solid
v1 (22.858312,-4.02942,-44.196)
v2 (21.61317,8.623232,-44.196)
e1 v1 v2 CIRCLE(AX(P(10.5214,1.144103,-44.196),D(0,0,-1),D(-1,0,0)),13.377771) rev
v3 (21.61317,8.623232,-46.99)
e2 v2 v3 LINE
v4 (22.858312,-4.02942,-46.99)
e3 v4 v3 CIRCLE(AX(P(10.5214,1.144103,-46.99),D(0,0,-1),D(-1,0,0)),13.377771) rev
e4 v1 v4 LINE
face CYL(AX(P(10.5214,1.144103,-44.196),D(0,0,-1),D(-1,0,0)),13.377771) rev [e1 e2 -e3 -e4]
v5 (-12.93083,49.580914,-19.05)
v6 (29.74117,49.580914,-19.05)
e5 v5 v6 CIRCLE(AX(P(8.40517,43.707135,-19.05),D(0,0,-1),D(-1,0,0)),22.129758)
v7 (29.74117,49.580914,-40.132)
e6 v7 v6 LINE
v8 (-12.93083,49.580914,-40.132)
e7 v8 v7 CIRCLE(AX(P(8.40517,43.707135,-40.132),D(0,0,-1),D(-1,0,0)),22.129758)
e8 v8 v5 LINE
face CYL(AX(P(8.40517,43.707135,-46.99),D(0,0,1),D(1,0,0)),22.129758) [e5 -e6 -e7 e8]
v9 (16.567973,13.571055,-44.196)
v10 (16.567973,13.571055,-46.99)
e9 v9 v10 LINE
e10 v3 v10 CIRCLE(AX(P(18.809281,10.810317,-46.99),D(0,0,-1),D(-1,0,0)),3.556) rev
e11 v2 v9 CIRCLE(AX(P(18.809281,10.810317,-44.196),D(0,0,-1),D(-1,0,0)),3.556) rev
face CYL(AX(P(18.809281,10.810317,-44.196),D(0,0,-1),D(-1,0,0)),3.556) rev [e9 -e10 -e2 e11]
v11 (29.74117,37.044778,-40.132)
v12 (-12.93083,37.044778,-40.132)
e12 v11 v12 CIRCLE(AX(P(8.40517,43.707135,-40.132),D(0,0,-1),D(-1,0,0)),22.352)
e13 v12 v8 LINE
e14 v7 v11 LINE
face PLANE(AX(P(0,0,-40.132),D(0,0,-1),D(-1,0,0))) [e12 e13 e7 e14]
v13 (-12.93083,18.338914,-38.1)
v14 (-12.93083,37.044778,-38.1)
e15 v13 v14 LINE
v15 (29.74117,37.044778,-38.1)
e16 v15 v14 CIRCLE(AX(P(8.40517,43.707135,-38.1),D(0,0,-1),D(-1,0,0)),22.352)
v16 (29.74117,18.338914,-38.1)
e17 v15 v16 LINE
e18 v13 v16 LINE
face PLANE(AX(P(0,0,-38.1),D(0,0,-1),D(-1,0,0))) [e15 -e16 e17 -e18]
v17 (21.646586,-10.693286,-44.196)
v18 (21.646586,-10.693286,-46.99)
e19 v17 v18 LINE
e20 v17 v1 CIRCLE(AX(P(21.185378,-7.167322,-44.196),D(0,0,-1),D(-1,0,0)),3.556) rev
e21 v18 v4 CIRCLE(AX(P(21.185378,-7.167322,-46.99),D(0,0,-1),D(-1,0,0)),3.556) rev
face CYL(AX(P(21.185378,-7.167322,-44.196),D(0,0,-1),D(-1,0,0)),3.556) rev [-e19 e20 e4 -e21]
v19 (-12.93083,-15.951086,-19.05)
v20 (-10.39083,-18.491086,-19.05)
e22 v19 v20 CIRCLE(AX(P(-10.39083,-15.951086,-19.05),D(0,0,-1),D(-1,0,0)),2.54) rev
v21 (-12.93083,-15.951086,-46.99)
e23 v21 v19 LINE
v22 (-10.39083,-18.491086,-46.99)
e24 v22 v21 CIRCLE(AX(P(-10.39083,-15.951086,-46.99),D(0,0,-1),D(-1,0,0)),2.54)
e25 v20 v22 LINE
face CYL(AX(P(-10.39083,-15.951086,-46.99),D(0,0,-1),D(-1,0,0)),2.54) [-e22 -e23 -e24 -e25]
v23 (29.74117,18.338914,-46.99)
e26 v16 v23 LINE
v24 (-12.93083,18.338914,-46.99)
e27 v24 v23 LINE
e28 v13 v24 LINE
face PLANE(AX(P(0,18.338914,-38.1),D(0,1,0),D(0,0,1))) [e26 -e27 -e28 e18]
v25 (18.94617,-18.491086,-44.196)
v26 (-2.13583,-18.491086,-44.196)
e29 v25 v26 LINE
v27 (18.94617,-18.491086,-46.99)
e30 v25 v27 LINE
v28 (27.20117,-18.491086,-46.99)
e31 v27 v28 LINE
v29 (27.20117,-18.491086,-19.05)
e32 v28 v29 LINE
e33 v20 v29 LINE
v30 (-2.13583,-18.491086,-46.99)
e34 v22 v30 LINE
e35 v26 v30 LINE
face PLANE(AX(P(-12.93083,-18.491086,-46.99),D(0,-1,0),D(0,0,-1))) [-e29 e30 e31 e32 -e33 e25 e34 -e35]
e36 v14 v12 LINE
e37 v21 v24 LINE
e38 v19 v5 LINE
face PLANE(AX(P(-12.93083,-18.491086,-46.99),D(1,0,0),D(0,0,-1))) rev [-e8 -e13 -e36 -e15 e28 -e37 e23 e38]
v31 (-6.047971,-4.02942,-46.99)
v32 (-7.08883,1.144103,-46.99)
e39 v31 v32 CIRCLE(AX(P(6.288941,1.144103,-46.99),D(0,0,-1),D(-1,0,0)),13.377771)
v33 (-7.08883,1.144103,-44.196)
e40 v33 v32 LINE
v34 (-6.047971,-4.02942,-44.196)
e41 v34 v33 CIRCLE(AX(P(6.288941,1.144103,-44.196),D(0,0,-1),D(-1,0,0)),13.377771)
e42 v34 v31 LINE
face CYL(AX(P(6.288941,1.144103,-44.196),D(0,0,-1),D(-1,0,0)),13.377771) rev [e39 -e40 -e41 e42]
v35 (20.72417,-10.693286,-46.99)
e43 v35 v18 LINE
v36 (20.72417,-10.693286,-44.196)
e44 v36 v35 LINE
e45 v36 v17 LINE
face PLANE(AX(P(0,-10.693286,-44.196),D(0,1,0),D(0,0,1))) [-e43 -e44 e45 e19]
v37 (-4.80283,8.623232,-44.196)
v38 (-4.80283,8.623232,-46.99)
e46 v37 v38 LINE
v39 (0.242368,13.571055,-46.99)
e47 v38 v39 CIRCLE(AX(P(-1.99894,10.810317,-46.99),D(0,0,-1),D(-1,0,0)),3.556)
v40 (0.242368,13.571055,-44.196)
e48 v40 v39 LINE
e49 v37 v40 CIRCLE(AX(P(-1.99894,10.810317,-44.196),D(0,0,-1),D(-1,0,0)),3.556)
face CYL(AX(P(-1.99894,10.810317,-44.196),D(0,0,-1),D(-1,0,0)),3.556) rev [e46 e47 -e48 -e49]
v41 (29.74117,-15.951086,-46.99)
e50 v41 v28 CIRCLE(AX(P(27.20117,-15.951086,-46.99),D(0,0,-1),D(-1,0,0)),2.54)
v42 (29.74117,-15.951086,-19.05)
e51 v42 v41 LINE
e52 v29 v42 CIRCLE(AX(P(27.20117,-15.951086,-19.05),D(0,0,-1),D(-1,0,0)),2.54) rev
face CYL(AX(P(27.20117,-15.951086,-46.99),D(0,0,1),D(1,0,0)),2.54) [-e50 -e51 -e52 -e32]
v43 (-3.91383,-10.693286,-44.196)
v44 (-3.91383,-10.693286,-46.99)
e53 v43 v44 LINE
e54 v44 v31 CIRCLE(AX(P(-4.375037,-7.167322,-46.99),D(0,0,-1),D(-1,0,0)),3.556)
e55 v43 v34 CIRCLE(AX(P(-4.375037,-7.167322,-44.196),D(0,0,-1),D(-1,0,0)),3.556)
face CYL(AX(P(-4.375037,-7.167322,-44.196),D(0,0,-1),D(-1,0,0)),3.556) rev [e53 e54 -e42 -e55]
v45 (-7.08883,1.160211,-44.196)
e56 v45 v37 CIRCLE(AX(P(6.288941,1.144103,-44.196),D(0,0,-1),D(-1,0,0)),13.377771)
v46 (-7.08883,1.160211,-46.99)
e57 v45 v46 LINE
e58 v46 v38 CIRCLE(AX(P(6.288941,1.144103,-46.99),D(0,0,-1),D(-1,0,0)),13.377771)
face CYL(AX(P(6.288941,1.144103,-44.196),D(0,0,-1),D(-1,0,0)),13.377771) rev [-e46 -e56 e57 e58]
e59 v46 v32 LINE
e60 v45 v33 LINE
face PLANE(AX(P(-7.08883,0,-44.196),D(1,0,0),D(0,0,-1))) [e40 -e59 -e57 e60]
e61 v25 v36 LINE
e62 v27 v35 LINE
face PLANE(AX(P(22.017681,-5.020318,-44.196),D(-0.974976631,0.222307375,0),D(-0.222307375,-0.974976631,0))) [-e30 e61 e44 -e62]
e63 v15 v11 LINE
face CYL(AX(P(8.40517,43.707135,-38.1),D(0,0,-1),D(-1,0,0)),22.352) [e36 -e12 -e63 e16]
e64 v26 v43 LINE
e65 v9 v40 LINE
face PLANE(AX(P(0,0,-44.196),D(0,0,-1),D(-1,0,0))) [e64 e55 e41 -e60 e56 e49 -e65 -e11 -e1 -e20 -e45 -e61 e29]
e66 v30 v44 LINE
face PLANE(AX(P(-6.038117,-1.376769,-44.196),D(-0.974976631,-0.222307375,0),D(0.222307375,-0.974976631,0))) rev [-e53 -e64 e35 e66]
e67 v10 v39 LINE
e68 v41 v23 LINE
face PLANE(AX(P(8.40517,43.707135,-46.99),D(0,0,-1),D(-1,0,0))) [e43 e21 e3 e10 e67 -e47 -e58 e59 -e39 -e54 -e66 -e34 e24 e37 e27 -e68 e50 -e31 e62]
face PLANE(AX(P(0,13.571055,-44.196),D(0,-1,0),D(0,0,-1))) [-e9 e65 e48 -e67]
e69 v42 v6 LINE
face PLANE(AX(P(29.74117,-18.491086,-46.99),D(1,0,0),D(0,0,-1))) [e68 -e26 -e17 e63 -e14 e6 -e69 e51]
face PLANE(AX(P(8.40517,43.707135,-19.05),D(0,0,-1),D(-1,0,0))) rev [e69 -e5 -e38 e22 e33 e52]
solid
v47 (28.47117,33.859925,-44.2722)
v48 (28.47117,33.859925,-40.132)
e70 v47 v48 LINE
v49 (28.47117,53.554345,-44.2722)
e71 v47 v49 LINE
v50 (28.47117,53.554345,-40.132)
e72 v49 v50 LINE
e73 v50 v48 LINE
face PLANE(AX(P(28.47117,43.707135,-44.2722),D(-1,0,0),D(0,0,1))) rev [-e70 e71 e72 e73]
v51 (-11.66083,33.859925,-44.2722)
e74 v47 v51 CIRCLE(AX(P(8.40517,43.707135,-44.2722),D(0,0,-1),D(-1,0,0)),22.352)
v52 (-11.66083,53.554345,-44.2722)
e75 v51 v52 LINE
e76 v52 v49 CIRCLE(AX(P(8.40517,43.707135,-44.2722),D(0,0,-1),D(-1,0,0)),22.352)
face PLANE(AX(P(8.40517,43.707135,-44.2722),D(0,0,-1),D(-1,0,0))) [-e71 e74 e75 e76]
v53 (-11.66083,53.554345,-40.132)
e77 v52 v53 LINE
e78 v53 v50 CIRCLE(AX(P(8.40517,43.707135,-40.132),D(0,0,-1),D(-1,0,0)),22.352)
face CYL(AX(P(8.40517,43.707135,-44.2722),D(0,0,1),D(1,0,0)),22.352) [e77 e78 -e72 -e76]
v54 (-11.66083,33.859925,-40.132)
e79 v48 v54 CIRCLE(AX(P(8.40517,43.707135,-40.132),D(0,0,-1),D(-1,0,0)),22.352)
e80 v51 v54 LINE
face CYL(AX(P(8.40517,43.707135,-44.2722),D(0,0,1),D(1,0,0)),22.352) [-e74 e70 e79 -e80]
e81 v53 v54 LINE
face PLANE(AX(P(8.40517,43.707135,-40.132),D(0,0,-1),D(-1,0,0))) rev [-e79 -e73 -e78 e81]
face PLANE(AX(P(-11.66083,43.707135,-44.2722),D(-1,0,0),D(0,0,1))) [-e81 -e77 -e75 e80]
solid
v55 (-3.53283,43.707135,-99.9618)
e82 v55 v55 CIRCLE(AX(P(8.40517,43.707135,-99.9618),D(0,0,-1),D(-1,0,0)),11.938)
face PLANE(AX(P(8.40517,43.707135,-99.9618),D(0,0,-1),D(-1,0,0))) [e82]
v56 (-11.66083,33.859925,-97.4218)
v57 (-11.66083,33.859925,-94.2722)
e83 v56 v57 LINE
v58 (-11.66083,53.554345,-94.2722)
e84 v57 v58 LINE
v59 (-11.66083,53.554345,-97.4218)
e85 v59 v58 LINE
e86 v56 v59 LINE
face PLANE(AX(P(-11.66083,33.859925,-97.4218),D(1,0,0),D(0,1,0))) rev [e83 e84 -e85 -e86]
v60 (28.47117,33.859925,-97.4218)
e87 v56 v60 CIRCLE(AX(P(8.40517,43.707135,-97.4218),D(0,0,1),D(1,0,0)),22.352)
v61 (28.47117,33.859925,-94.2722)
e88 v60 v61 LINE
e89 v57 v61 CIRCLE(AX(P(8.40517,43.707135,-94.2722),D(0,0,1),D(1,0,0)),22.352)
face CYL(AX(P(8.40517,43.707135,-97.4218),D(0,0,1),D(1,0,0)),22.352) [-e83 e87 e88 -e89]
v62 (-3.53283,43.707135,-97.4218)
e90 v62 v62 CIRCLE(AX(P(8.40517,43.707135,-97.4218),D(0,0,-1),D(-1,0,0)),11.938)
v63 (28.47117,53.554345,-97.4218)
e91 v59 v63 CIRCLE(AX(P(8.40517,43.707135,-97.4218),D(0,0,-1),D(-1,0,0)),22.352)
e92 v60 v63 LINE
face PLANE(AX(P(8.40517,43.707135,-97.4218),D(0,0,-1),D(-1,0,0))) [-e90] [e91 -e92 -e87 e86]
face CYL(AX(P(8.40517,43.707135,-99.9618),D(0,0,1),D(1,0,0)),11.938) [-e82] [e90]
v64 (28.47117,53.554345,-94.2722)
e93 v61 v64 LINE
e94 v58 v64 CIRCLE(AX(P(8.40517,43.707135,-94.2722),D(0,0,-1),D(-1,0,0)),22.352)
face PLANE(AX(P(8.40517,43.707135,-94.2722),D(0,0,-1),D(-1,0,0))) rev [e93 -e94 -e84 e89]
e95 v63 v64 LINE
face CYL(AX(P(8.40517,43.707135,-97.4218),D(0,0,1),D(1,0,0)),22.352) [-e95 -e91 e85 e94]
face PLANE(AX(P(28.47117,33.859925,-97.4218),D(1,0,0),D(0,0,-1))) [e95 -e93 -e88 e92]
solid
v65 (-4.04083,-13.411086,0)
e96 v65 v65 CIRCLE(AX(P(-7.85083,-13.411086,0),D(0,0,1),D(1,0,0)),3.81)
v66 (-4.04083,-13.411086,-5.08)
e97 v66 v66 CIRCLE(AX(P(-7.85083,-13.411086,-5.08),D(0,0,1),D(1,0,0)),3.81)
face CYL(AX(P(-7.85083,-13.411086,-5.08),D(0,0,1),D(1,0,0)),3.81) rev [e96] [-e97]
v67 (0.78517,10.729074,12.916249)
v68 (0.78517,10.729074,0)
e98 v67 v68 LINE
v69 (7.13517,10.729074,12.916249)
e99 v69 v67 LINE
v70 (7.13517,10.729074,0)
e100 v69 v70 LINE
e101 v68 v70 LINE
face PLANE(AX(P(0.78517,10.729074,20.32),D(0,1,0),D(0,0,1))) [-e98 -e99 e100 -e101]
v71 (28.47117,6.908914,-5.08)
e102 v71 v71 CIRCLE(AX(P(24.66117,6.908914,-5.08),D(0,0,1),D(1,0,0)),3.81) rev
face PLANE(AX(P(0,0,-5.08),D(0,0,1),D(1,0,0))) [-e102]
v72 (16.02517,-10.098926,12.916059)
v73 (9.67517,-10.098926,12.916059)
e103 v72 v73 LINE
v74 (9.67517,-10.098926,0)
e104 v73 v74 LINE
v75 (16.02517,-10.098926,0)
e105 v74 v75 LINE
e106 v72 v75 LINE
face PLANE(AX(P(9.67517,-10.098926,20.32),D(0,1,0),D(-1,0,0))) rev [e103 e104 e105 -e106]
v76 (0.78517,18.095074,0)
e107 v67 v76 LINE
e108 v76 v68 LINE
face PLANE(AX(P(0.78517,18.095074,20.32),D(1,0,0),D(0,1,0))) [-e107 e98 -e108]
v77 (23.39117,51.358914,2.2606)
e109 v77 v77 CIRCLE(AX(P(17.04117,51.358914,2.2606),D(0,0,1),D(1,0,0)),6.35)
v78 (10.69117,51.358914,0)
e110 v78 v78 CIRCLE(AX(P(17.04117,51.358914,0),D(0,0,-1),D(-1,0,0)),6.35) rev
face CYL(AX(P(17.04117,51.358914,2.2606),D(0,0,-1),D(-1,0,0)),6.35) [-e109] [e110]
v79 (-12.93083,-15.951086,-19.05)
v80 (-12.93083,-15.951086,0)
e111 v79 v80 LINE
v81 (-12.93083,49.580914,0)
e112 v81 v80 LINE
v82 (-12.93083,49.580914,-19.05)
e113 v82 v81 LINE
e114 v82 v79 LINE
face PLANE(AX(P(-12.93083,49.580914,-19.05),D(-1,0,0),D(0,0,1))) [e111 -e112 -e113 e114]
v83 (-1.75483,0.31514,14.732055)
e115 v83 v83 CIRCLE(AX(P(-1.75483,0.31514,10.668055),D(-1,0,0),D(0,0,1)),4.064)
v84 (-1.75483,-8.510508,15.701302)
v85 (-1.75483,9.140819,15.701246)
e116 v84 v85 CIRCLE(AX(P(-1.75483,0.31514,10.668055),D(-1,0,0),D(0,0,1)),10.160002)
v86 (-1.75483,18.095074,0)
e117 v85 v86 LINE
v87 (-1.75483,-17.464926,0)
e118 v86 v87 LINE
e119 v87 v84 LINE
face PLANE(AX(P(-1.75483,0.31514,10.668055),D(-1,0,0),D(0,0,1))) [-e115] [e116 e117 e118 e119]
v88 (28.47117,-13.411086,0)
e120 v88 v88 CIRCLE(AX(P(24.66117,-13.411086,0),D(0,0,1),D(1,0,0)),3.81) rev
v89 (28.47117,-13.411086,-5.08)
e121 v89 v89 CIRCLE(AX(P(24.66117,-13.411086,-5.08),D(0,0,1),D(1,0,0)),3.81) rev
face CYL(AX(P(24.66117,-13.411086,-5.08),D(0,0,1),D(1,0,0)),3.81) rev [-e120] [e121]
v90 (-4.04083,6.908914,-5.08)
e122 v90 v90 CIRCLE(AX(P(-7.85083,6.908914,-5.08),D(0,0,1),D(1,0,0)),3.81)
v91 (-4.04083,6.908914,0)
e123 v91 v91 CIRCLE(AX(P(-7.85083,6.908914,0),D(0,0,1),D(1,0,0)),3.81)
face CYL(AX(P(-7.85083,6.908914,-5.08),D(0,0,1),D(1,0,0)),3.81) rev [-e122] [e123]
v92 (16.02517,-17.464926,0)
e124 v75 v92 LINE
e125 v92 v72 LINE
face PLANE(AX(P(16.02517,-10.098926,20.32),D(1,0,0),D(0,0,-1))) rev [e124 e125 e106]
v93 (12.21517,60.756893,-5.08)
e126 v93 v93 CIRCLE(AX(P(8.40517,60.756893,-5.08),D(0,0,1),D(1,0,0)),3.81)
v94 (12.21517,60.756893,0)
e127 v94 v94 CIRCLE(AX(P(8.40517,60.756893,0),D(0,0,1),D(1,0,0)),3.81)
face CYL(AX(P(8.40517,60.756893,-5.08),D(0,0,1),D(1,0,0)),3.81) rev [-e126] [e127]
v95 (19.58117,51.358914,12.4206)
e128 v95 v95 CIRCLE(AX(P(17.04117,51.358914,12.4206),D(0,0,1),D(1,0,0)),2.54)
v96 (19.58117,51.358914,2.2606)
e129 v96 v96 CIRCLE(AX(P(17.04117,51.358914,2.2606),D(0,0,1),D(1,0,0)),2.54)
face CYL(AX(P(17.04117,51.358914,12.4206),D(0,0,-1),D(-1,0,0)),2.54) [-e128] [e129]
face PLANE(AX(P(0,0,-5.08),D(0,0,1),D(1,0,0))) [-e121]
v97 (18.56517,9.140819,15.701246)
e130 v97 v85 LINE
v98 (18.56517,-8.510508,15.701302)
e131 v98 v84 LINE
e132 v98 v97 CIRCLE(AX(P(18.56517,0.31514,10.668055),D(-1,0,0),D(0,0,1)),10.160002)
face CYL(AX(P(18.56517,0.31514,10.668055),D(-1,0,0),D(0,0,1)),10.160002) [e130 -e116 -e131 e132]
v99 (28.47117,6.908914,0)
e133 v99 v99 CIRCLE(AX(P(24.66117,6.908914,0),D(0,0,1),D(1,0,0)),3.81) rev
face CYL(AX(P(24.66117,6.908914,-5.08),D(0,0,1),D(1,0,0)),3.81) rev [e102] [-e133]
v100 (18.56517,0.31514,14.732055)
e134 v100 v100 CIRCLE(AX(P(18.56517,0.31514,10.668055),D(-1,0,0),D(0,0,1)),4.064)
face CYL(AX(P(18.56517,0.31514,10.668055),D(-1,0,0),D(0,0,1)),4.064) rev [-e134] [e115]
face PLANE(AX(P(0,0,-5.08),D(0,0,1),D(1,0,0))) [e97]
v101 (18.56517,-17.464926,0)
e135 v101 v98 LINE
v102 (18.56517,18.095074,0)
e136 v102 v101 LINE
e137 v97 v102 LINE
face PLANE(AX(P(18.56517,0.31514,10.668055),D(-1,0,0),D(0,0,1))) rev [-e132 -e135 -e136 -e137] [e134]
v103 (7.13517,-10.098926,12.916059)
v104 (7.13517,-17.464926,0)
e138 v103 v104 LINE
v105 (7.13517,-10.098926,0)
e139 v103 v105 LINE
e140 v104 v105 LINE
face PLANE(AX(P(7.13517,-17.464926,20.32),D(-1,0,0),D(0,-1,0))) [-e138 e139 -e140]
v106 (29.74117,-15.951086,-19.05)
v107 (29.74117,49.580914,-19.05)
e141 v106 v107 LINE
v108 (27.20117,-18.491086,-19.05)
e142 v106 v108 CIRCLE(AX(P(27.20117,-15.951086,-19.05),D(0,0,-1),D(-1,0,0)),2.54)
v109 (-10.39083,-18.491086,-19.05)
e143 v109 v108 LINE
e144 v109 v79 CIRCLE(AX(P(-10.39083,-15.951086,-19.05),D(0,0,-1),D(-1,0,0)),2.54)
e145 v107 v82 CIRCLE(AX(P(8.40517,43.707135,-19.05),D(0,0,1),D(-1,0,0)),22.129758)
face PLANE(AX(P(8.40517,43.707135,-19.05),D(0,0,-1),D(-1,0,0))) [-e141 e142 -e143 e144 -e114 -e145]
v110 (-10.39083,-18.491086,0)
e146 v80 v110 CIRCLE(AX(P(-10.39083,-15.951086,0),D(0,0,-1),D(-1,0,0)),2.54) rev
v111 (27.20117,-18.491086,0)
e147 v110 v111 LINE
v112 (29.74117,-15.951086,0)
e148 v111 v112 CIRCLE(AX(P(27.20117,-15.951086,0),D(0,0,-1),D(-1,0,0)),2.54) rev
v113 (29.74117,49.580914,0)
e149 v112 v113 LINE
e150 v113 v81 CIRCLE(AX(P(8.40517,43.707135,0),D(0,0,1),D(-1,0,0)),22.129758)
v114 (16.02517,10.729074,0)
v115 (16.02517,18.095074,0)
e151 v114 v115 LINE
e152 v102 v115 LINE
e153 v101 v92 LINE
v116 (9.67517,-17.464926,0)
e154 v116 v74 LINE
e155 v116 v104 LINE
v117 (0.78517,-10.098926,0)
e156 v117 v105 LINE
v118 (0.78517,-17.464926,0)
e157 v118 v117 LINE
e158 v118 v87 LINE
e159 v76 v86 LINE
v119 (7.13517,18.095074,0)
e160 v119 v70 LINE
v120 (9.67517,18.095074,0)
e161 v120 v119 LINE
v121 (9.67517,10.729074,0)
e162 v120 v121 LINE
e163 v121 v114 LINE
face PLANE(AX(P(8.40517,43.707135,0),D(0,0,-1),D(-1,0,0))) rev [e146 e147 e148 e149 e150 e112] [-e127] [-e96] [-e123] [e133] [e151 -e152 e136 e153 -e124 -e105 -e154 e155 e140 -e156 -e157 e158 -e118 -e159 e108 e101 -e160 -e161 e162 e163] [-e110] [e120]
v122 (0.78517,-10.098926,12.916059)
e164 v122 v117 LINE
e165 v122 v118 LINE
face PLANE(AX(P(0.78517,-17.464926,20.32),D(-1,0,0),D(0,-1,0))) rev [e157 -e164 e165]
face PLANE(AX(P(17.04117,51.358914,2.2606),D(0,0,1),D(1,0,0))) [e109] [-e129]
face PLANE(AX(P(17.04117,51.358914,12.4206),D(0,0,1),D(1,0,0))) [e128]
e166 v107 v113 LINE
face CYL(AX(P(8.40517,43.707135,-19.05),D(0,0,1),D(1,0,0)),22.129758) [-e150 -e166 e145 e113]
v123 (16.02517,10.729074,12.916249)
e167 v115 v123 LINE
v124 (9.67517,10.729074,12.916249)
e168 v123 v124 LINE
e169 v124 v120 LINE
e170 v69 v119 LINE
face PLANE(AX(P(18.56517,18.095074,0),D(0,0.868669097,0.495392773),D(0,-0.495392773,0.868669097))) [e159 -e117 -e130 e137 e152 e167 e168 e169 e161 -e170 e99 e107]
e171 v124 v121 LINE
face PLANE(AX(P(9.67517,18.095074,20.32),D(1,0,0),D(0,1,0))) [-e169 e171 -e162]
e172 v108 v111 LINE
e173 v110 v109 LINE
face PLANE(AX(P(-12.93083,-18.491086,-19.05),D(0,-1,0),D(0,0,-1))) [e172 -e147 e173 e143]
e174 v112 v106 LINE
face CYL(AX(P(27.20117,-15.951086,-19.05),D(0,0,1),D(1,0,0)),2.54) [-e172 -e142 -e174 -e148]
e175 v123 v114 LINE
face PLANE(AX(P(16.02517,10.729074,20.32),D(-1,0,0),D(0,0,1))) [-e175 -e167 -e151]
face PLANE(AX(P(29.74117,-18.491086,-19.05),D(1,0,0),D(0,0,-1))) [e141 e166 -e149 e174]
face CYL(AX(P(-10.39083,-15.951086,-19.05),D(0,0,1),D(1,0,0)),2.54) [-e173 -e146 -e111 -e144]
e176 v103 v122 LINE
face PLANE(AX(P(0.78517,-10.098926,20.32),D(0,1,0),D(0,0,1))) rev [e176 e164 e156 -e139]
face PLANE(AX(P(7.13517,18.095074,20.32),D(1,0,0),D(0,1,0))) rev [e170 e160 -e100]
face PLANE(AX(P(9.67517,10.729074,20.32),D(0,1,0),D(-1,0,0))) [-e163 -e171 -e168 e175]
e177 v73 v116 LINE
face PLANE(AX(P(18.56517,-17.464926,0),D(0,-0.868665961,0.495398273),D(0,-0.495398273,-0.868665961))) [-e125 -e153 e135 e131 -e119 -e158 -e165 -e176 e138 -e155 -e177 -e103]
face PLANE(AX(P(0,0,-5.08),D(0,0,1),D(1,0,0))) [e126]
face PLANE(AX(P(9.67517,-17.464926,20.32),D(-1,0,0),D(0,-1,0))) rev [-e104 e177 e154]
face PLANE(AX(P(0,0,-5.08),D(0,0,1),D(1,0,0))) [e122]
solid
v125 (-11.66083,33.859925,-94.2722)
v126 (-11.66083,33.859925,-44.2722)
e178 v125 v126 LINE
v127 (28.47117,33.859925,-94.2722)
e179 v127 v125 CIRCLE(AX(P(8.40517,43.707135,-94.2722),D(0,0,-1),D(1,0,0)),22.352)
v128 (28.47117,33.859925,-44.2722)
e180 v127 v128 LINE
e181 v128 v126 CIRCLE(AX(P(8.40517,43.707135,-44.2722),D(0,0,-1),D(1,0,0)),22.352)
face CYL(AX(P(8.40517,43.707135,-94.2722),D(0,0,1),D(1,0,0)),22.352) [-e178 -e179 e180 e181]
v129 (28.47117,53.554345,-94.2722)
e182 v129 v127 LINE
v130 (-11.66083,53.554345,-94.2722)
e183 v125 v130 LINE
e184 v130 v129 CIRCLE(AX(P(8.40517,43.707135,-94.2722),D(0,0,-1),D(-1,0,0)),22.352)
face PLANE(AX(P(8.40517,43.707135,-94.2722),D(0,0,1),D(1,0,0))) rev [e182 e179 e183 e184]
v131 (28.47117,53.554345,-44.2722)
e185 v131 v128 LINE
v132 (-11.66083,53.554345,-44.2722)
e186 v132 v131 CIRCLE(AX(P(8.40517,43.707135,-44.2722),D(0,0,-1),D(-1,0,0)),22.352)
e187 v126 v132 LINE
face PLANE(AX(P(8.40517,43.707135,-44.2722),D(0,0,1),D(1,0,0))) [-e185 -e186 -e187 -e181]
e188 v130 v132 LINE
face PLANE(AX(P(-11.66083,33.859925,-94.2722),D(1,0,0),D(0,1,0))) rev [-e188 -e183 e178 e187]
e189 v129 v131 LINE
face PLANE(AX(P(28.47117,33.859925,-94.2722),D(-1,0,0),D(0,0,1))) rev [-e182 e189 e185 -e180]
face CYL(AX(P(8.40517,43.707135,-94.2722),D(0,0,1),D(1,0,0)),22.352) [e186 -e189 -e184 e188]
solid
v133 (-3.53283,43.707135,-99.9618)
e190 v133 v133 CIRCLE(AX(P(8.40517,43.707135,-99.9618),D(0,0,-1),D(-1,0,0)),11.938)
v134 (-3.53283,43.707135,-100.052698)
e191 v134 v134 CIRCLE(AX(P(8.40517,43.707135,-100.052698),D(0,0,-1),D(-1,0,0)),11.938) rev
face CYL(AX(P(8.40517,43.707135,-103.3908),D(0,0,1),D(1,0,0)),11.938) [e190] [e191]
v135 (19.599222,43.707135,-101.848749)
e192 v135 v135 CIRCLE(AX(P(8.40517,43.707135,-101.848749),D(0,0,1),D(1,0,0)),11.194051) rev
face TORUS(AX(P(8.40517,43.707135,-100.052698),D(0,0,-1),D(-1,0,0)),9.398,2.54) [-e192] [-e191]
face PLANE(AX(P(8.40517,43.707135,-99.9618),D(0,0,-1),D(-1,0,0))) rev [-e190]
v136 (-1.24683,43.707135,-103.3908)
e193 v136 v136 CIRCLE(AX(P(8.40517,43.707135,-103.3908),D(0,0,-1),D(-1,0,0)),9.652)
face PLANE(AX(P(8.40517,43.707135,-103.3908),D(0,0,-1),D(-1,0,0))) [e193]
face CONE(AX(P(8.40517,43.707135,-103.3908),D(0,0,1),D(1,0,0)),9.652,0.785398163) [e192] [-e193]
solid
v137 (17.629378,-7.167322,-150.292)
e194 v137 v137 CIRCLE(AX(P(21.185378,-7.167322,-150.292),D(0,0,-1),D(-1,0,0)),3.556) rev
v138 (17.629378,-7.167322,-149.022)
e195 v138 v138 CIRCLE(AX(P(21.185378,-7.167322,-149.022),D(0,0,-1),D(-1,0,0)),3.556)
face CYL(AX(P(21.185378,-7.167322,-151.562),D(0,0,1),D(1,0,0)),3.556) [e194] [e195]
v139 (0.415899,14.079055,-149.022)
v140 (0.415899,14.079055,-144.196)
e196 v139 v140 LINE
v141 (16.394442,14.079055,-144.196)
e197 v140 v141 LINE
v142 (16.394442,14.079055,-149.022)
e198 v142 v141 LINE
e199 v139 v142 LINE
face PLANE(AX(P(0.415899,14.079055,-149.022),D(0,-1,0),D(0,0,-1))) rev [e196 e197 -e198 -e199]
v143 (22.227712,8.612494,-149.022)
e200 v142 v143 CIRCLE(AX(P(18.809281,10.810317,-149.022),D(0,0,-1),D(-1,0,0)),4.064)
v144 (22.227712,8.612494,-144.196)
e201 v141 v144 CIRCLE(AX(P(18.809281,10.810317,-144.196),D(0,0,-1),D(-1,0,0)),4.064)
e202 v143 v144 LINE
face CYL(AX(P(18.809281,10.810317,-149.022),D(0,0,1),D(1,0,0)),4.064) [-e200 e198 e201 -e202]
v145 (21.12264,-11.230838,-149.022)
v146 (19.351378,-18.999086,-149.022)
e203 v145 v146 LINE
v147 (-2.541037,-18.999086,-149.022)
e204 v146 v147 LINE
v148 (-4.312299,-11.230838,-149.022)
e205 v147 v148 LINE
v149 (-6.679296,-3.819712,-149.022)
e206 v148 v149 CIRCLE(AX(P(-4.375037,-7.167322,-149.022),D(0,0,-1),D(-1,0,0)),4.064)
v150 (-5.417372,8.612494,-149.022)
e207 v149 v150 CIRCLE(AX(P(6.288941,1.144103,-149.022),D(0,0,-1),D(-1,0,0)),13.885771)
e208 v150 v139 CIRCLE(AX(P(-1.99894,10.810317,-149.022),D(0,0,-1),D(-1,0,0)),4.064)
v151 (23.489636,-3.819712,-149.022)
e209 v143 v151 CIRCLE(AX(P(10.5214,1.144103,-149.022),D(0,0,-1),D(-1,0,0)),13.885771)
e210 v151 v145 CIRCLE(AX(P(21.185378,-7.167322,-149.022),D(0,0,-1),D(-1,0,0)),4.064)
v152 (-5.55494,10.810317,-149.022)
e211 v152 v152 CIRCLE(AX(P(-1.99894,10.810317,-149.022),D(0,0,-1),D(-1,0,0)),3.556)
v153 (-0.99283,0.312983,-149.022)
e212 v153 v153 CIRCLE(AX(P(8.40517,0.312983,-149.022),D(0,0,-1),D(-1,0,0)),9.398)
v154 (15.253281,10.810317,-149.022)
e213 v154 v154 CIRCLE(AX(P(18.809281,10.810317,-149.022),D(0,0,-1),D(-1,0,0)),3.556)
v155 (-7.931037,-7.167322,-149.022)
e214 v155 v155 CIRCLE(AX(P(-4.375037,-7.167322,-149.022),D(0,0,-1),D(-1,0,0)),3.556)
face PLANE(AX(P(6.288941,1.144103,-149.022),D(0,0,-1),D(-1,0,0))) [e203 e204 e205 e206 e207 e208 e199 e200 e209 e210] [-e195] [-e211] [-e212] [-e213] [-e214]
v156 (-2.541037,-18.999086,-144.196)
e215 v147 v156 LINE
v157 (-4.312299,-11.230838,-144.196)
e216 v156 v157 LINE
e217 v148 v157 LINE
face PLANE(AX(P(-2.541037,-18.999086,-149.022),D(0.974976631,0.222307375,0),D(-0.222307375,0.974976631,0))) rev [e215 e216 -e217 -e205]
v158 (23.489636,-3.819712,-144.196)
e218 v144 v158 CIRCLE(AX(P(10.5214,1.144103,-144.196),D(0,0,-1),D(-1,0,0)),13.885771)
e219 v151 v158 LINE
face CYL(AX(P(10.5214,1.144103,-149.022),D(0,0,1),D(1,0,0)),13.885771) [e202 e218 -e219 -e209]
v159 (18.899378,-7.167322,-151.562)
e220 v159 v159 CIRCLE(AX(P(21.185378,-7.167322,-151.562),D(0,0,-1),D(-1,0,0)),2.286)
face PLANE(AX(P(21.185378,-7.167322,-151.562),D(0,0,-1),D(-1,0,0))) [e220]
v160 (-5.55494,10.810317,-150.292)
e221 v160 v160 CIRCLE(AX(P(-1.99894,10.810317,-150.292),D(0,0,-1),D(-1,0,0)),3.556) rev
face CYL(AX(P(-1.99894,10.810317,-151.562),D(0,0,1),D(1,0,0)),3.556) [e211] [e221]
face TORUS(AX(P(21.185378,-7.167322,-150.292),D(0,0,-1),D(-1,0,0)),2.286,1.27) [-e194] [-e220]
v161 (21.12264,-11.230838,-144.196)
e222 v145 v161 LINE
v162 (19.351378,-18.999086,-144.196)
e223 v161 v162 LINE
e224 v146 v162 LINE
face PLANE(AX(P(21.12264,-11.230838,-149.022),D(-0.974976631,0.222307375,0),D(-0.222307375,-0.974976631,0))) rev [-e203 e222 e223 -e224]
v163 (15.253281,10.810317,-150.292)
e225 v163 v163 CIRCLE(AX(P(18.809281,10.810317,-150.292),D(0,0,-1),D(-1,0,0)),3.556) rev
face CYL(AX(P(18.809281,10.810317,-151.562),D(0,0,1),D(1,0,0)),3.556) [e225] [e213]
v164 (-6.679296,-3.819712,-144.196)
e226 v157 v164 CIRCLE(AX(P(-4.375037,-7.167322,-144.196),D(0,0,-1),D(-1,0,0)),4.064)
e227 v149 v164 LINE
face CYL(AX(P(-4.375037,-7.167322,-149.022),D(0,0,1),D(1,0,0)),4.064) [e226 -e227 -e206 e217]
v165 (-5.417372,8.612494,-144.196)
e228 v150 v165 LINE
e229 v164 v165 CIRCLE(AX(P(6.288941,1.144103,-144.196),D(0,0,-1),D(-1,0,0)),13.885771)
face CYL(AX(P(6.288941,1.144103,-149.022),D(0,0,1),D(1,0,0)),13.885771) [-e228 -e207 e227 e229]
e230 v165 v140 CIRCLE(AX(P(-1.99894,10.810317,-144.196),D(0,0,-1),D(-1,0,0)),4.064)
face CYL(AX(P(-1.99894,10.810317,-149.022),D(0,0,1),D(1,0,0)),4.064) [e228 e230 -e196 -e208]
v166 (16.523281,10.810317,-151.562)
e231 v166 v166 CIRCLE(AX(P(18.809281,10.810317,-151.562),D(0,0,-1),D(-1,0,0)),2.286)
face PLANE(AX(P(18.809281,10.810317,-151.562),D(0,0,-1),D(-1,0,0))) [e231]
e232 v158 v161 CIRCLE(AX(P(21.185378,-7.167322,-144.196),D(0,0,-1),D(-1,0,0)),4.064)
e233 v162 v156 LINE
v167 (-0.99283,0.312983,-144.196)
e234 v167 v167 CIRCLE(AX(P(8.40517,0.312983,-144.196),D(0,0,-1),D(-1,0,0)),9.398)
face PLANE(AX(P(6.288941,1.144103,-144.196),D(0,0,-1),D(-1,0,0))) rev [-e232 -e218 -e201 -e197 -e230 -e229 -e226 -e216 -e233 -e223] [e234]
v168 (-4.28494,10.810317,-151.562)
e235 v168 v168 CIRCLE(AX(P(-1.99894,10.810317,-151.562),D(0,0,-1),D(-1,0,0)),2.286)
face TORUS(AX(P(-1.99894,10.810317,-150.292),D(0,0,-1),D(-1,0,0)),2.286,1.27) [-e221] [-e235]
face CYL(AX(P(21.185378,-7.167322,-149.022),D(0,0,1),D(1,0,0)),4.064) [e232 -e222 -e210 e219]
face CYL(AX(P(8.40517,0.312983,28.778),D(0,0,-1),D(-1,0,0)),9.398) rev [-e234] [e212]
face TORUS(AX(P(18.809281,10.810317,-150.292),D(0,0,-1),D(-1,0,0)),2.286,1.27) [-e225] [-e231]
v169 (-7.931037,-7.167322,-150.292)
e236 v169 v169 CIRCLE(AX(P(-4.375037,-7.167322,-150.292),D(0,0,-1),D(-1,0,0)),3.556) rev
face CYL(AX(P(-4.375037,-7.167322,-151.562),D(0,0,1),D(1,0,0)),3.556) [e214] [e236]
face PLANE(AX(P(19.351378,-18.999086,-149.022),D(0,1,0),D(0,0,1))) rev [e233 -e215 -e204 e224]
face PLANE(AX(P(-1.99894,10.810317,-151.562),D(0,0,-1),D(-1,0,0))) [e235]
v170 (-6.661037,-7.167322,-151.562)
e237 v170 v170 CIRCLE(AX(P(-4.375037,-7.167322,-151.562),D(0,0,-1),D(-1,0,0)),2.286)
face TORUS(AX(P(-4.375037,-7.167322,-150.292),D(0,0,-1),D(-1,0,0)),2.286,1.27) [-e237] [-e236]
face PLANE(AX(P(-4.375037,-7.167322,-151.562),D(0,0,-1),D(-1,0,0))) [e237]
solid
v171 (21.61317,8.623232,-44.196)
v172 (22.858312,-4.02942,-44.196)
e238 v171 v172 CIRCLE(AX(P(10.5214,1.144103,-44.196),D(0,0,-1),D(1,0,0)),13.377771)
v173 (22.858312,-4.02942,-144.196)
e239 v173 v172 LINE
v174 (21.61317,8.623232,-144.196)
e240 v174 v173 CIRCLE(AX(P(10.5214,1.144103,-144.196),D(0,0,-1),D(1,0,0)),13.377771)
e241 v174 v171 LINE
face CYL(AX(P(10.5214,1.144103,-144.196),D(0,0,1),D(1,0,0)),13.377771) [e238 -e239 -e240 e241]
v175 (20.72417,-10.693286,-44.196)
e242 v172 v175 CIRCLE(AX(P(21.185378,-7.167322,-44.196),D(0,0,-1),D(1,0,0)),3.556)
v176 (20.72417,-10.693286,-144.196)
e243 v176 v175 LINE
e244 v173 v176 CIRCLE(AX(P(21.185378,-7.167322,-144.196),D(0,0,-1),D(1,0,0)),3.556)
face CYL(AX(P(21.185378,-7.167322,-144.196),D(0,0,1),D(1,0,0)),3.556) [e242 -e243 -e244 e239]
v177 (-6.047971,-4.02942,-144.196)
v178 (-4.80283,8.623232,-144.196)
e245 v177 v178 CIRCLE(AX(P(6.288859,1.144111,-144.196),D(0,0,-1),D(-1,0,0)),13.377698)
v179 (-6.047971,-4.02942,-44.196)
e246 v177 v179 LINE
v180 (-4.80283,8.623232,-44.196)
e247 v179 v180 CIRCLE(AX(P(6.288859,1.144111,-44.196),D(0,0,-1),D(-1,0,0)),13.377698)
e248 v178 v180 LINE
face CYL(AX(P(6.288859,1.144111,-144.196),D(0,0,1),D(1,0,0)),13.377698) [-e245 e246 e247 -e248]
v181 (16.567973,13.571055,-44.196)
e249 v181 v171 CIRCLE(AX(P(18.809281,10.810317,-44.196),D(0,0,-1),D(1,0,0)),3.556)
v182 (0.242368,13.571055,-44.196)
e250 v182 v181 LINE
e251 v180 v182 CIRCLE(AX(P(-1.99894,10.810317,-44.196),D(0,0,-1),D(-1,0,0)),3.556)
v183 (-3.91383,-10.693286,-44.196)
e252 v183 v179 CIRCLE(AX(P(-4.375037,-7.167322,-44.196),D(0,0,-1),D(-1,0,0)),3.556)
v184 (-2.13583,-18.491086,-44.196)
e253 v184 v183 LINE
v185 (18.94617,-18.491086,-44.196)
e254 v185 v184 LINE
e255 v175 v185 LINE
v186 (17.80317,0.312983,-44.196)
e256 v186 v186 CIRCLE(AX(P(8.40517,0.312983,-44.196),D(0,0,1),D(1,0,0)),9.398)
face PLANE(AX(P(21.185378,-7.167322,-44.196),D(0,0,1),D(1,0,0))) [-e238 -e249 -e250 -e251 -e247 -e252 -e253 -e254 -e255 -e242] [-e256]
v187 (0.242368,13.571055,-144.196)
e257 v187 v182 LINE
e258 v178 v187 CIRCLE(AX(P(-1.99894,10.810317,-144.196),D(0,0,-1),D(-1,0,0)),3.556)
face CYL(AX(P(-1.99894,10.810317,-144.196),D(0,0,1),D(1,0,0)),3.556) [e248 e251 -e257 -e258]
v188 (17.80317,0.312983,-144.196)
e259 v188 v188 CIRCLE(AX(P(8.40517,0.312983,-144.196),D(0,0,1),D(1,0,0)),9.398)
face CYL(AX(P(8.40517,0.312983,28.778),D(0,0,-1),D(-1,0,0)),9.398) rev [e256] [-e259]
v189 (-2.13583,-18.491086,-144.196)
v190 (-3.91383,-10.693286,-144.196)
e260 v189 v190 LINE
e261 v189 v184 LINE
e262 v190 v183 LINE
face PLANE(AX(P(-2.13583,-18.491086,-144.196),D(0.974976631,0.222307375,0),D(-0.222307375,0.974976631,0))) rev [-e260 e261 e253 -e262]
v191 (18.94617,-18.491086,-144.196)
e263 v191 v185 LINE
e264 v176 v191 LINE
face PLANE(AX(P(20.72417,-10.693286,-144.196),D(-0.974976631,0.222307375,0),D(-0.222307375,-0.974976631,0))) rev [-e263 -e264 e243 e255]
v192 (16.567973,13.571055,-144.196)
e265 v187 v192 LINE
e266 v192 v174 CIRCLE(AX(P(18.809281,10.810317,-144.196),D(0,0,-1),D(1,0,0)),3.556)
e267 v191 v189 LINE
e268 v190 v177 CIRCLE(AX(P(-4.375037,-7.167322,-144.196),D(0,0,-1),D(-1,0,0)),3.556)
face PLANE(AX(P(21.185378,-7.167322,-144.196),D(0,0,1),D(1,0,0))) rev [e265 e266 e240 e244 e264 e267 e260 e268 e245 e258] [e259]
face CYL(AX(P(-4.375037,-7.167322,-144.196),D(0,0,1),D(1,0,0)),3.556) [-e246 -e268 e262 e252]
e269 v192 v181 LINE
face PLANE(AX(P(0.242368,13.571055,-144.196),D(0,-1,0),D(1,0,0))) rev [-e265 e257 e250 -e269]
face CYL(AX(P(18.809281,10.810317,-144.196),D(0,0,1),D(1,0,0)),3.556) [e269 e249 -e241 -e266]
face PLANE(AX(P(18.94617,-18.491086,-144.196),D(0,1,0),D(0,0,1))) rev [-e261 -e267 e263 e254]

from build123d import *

# Parameters (mm, degrees)
BOSS_EXTRUDE1_DEPTH  = 19.05
SKETCH6_R            = 3.81
CUT_EXTRUDE2_DEPTH   = 5.08
SKETCH12_R           = 3.81
CUT_EXTRUDE3_DEPTH   = 5.08
BOSS_EXTRUDE11_DEPTH = 27.94
CUT_EXTRUDE4_DEPTH   = 8.89
CUT_EXTRUDE5_START   = -6.858
CUT_EXTRUDE5_DEPTH   = 6.858
BOSS_EXTRUDE13_DEPTH = 4.1402
BOSS_EXTRUDE14_DEPTH = 50
BOSS_EXTRUDE16_DEPTH = 3.1496
SKETCH26_R           = 11.938
BOSS_EXTRUDE17_DEPTH = 2.54
SKETCH27_R           = 11.938
BOSS_EXTRUDE20_DEPTH = 3.429
CHAMFER1_SIZE        = 2.286
FILLET11_R           = 2.54
CUT_EXTRUDE6_START   = -2.794
CUT_EXTRUDE6_DEPTH   = 2.794
BOSS_EXTRUDE21_DEPTH = 100
BOSS_EXTRUDE23_DEPTH = 4.826
SKETCH32_R           = 9.398
BOSS_EXTRUDE24_DEPTH = 8.128
SKETCH43_R           = 3.556
BOSS_EXTRUDE26_DEPTH = 2.54
FILLET13_R           = 1.27
SKETCH44_R           = 6.35
BOSS_EXTRUDE27_DEPTH = 2.2606
SKETCH45_R           = 2.54
BOSS_EXTRUDE28_DEPTH = 10.16
BOSS_EXTRUDE29_START = -11.176
SKETCH3_R            = 4.064
BOSS_EXTRUDE29_DEPTH = 20.32
SKETCH46_W           = 6.35
SKETCH46_H           = 7.366
CUT_EXTRUDE9_DEPTH   = 20.32
MOVE_START           = -1.75482957
MOVE_FACE1_DEPTH     = 20.32
MOVE_START_2         = 0.78517043
MOVE_FACE1_2_DEPTH   = 6.35
MOVE_START_3         = 9.67517043
MOVE_FACE1_3_DEPTH   = 6.35
MOVE_FACE1_4_DEPTH   = 20.32
MOVE_FACE1_5_DEPTH   = 2.54
MOVE_START_4         = 7.13517043
MOVE_FACE1_6_DEPTH   = 2.54
MOVE_START_5         = 16.02517043
MOVE_FACE1_7_DEPTH   = 2.54
FILLET14_R           = 2.54
FILLET15_R           = 2.54
SKETCH34_R           = 9.398
CUT_EXTRUDE11_DEPTH  = 185.928


# Read off the part's stored shape, not the designer's step: Cut-Extrude6, Move Face1
with BuildPart() as part:
    # Sketch1 → Boss-Extrude1 (new body)
    with BuildSketch(Plane.XY):
        with BuildLine():
            Line((-12.93082957, -18.491086285), (29.74117043, -18.491086285))
            Line((29.74117043, -18.491086285), (29.74117043, 49.580913715))
            ThreePointArc((29.74117043, 49.580913715), (8.40517043, 65.836892729), (-12.93082957, 49.580913715))
            Line((-12.93082957, 49.580913715), (-12.93082957, -18.491086285))
        make_face()
    extrude(amount=-BOSS_EXTRUDE1_DEPTH)

    # Sketch6 → Cut-Extrude2 (cut)
    with BuildSketch(Plane.XY):
        with Locations((-7.85082957, 6.908913715)):
            Circle(SKETCH6_R)
        with Locations((-7.85082957, -13.411086285)):
            Circle(SKETCH6_R)
        with Locations((24.66117043, 6.908913715)):
            Circle(SKETCH6_R)
        with Locations((24.66117043, -13.411086285)):
            Circle(SKETCH6_R)
    extrude(amount=-CUT_EXTRUDE2_DEPTH, mode=Mode.SUBTRACT)

    # Sketch12 → Cut-Extrude3 (cut)
    with BuildSketch(Plane.XY):
        with Locations((8.40517043, 60.756892729)):
            Circle(SKETCH12_R)
    extrude(amount=-CUT_EXTRUDE3_DEPTH, mode=Mode.SUBTRACT)

    # Sketch44 → Boss-Extrude27 (add)
    with BuildSketch(Plane.XY):
        with Locations(Location((17.04117043, 51.358913715, 0), (0, 0, 180))):
            Circle(SKETCH44_R)
    extrude(amount=BOSS_EXTRUDE27_DEPTH)

    # Sketch45 → Boss-Extrude28 (add)
    with BuildSketch(Plane.XY.offset(2.2606)):
        with Locations((17.04117043, 51.358913715)):
            Circle(SKETCH45_R)
    extrude(amount=BOSS_EXTRUDE28_DEPTH)

    # Sketch3 → Boss-Extrude29 (add)
    with BuildSketch(Plane.ZY.offset(12.93082957).offset(BOSS_EXTRUDE29_START)):
        with BuildLine():
            Line((0, -16.662286285), (0, 1.117779576))
            Line((0, 1.117779576), (0, 18.897713715))
            Line((0, 18.897713715), (15.701246407, 9.943459406))
            ThreePointArc((15.701246407, 9.943459406), (20.828056876, 1.117811735), (15.701302277, -7.70786839))
            Line((15.701302277, -7.70786839), (0, -16.662286285))
        make_face()
        with Locations((10.668054799, 1.117779576)):
            Circle(SKETCH3_R, mode=Mode.SUBTRACT)
    extrude(amount=-BOSS_EXTRUDE29_DEPTH)

    # Sketch46 → Cut-Extrude9 (cut)
    with BuildSketch(Plane.XY):
        with Locations((3.96017043, 15.214713715)):
            Rectangle(SKETCH46_W, SKETCH46_H)
        with Locations((12.85017043, 15.214713715)):
            Rectangle(SKETCH46_W, SKETCH46_H)
        with Locations((3.96017043, -12.979286285)):
            Rectangle(SKETCH46_W, SKETCH46_H)
        with Locations((12.85017043, -12.979286285)):
            Rectangle(SKETCH46_W, SKETCH46_H)
    extrude(amount=CUT_EXTRUDE9_DEPTH, mode=Mode.SUBTRACT)

    # Move Face1 outline → Move Face1 (cut)
    with BuildSketch(Plane.YZ.offset(MOVE_START)):
        with BuildLine():
            Line((9.140819406, 15.701246407), (18.095073715, 0))
            Line((18.095073715, 0), (18.897713715, 0))
            Line((18.897713715, 0), (9.943459406, 15.701246407))
            ThreePointArc((9.943459406, 15.701246407), (6.046592425, 19.552448201), (0.716459577, 20.820127714))
            ThreePointArc((0.716459577, 20.820127714), (5.591039303, 19.350826493), (9.140819406, 15.701246407))
        make_face()
        with BuildLine():
            ThreePointArc((0.716459576, 6.623918518), (-2.946220424, 10.668054799), (0.716459576, 14.71219108))
            ThreePointArc((0.716459576, 14.71219108), (-3.748860424, 10.668054799), (0.716459576, 6.623918518))
        make_face()
    extrude(amount=MOVE_FACE1_DEPTH, mode=Mode.SUBTRACT)

    # Move Face1 2 outline → Move Face1 2 (cut)
    with BuildSketch(Plane.YZ.offset(MOVE_START_2)):
        Polygon((11.531713715, 11.508823522), (10.729073716, 12.916249308), (10.729073715, 0), (11.531713715, 0), align=None)
    extrude(amount=MOVE_FACE1_2_DEPTH, mode=Mode.SUBTRACT)

    # Move Face1 3 outline → Move Face1 3 (cut)
    with BuildSketch(Plane.YZ.offset(MOVE_START_3)):
        Polygon((11.531713715, 11.508823522), (10.729073716, 12.916249308), (10.729073715, 0), (11.531713715, 0), align=None)
    extrude(amount=MOVE_FACE1_3_DEPTH, mode=Mode.SUBTRACT)

    # Move Face1 4 outline → Move Face1 4 (add)
    with BuildSketch(Plane.YZ.offset(MOVE_START)):
        with BuildLine():
            ThreePointArc((-7.70786839, 15.701302277), (-4.158092666, 19.350843192), (0.716459577, 20.820127714))
            ThreePointArc((0.716459577, 20.820127714), (-4.61364515, 19.552463801), (-8.51050839, 15.701302277))
            Line((-8.51050839, 15.701302277), (-10.098926285, 12.916059306))
            Line((-10.098926285, 12.916059306), (-10.098926285, 0))
            Line((-10.098926285, 0), (-9.296286285, 0))
            Line((-9.296286285, 0), (-9.296286285, 12.916059306))
            Line((-9.296286285, 12.916059306), (-7.70786839, 15.701302277))
        make_face()
        with BuildLine():
            ThreePointArc((0.716459576, 14.71219108), (4.379139576, 10.668054799), (0.716459576, 6.623918518))
            ThreePointArc((0.716459576, 6.623918518), (5.181779576, 10.668054799), (0.716459576, 14.71219108))
        make_face()
    extrude(amount=MOVE_FACE1_4_DEPTH)

    # Move Face1 5 outline → Move Face1 5 (add)
    with BuildSketch(Plane.YZ.offset(MOVE_START)):
        Polygon((-10.098926285, 11.508654222), (-10.098926285, 12.916059306), (-17.464926285, 0), (-16.662286285, 0), align=None)
    extrude(amount=MOVE_FACE1_5_DEPTH)

    # Move Face1 6 outline → Move Face1 6 (add)
    with BuildSketch(Plane.YZ.offset(MOVE_START_4)):
        Polygon((-10.098926285, 11.508654222), (-10.098926285, 12.916059306), (-17.464926285, 0), (-16.662286285, 0), align=None)
    extrude(amount=MOVE_FACE1_6_DEPTH)

    # Move Face1 7 outline → Move Face1 7 (add)
    with BuildSketch(Plane.YZ.offset(MOVE_START_5)):
        Polygon((-10.098926285, 11.508654222), (-10.098926285, 12.916059306), (-17.464926285, 0), (-16.662286285, 0), align=None)
    extrude(amount=MOVE_FACE1_7_DEPTH)

    # Fillet14
    fillet14_edges = [part.edges().sort_by_distance(p)[0] for p in [
        (29.74117043, -18.491086285, -9.525),
        (-12.93082957, -18.491086285, -9.525),
    ]]
    fillet(fillet14_edges, radius=FILLET14_R)


with BuildPart() as body_2:
    # Sketch17 → Boss-Extrude11 (new body)
    with BuildSketch(Plane(origin=(0, 0, -19.05), x_dir=(-1, 0, 0), z_dir=(0, 0, -1))):
        with BuildLine():
            Line((12.93082957, -18.491086285), (-29.74117043, -18.491086285))
            Line((-29.74117043, -18.491086285), (-29.74117043, 49.580913715))
            ThreePointArc((-29.74117043, 49.580913715), (-8.40517043, 65.836892729), (12.93082957, 49.580913715))
            Line((12.93082957, 49.580913715), (12.93082957, -18.491086285))
        make_face()
    extrude(amount=BOSS_EXTRUDE11_DEPTH)

    # Sketch18 → Cut-Extrude4 (cut)
    with BuildSketch(Plane(origin=(0, 0, -46.99), x_dir=(-1, 0, 0), z_dir=(0, 0, -1))):
        with BuildLine():
            Line((-29.74117043, 18.338913715), (12.93082957, 18.338913715))
            Line((12.93082957, 18.338913715), (12.93082957, 37.044777605))
            ThreePointArc((12.93082957, 37.044777605), (-8.40517043, 21.355135146), (-29.74117043, 37.044777605))
            Line((-29.74117043, 37.044777605), (-29.74117043, 18.338913715))
        make_face()
    extrude(amount=-CUT_EXTRUDE4_DEPTH, mode=Mode.SUBTRACT)

    # Sketch18<5> → Cut-Extrude5 (cut)
    with BuildSketch(Plane(origin=(0, 0, -46.99), x_dir=(-1, 0, 0), z_dir=(0, 0, -1)).offset(CUT_EXTRUDE5_START)):
        with BuildLine():
            Line((12.93082957, 49.580913715), (12.93082957, 37.044777605))
            ThreePointArc((12.93082957, 37.044777605), (13.691369751, 40.337444359), (13.94682957, 43.707135146))
            ThreePointArc((13.94682957, 43.707135146), (-11.774861217, 65.803675328), (-29.74117043, 37.044777605))
            Line((-29.74117043, 37.044777605), (-29.74117043, 49.580913715))
            ThreePointArc((-29.74117043, 49.580913715), (-8.40517043, 65.836892729), (12.93082957, 49.580913715))
        make_face()
        with BuildLine():
            ThreePointArc((-29.74117043, 37.044777605), (-8.40517043, 21.355135146), (12.93082957, 37.044777605))
            Line((12.93082957, 37.044777605), (12.93082957, 49.580913715))
            ThreePointArc((12.93082957, 49.580913715), (-8.40517043, 65.836892729), (-29.74117043, 49.580913715))
            Line((-29.74117043, 49.580913715), (-29.74117043, 37.044777605))
        make_face()
    extrude(amount=CUT_EXTRUDE5_DEPTH, mode=Mode.SUBTRACT)

    # Cut-Extrude6 outline → Cut-Extrude6 (cut)
    with BuildSketch(Plane(origin=(0, 0, -46.99), x_dir=(-1, 0, 0), z_dir=(0, 0, -1)).offset(CUT_EXTRUDE6_START)):
        with BuildLine():
            ThreePointArc((-16.567972961, 13.571054992), (-21.299133174, 13.349170074), (-21.61317043, 8.623232021))
            ThreePointArc((-21.61317043, 8.623232021), (-23.83485908, 2.454274355), (-22.858312088, -4.029420203))
            ThreePointArc((-22.858312088, -4.029420203), (-24.684009124, -7.803496663), (-21.646586083, -10.693286285))
            Line((-21.646586083, -10.693286285), (-20.72417043, -10.693286285))
            Line((-20.72417043, -10.693286285), (-18.94617043, -18.491086285))
            Line((-18.94617043, -18.491086285), (2.13582957, -18.491086285))
            Line((2.13582957, -18.491086285), (3.91382957, -10.693286285))
            ThreePointArc((3.91382957, -10.693286285), (7.761606127, -8.251890338), (6.047971228, -4.029420203))
            ThreePointArc((6.047971228, -4.029420203), (6.826033776, -1.49449173), (7.08882957, 1.144102983))
            Line((7.08882957, 1.144102983), (7.088819872, 1.160210788))
            ThreePointArc((7.088819872, 1.160210788), (6.502214683, 5.062148637), (4.80282957, 8.623232021))
            ThreePointArc((4.80282957, 8.623232021), (4.488792314, 13.349170074), (-0.242367899, 13.571054992))
            Line((-0.242367899, 13.571054992), (-16.567972961, 13.571054992))
        make_face()
    extrude(amount=CUT_EXTRUDE6_DEPTH, mode=Mode.SUBTRACT)

    # Fillet15
    fillet15_edges = [body_2.edges().sort_by_distance(p)[0] for p in [
        (-12.93082957, -18.491086285, -33.02),
        (29.74117043, -18.491086285, -33.02),
    ]]
    fillet(fillet15_edges, radius=FILLET15_R)


with BuildPart() as body_3:
    # Sketch23 → Boss-Extrude13 (new body)
    with BuildSketch(Plane(origin=(0, 0, -40.132), x_dir=(-1, 0, 0), z_dir=(0, 0, -1))):
        with BuildLine():
            Line((11.66082957, 43.707135146), (11.66082957, 33.859924983))
            ThreePointArc((11.66082957, 33.859924983), (-8.40517043, 21.355135146), (-28.47117043, 33.859924983))
            Line((-28.47117043, 33.859924983), (-28.47117043, 43.707135146))
            Line((-28.47117043, 43.707135146), (-28.47117043, 53.554345309))
            ThreePointArc((-28.47117043, 53.554345309), (-8.40517043, 66.059135146), (11.66082957, 53.554345309))
            Line((11.66082957, 53.554345309), (11.66082957, 43.707135146))
        make_face()
    extrude(amount=BOSS_EXTRUDE13_DEPTH)


with BuildPart() as body_4:
    # Sketch24 → Boss-Extrude14 (new body)
    with BuildSketch(Plane(origin=(0, 0, -44.2722), x_dir=(-1, 0, 0), z_dir=(0, 0, -1))):
        with BuildLine():
            Line((11.66082957, 33.859924983), (11.66082957, 53.554345309))
            ThreePointArc((11.66082957, 53.554345309), (-8.40517043, 66.059135146), (-28.47117043, 53.554345309))
            Line((-28.47117043, 53.554345309), (-28.47117043, 33.859924983))
            ThreePointArc((-28.47117043, 33.859924983), (-8.40517043, 21.355135146), (11.66082957, 33.859924983))
        make_face()
    extrude(amount=BOSS_EXTRUDE14_DEPTH)


with BuildPart() as body_5:
    # Sketch25 → Boss-Extrude16 (new body)
    with BuildSketch(Plane(origin=(0, 0, -94.2722), x_dir=(-1, 0, 0), z_dir=(0, 0, -1))):
        with BuildLine():
            Line((11.66082957, 33.859924983), (11.66082957, 53.554345309))
            ThreePointArc((11.66082957, 53.554345309), (-8.40517043, 66.059135146), (-28.47117043, 53.554345309))
            Line((-28.47117043, 53.554345309), (-28.47117043, 33.859924983))
            ThreePointArc((-28.47117043, 33.859924983), (-8.40517043, 21.355135146), (11.66082957, 33.859924983))
        make_face()
    extrude(amount=BOSS_EXTRUDE16_DEPTH)

    # Sketch26 → Boss-Extrude17 (add)
    with BuildSketch(Plane(origin=(0, 0, -97.4218), x_dir=(-1, 0, 0), z_dir=(0, 0, -1))):
        with Locations((-8.40517043, 43.707135146)):
            Circle(SKETCH26_R)
    extrude(amount=BOSS_EXTRUDE17_DEPTH)


with BuildPart() as body_6:
    # Sketch27 → Boss-Extrude20 (new body)
    with BuildSketch(Plane(origin=(0, 0, -99.9618), x_dir=(-1, 0, 0), z_dir=(0, 0, -1))):
        with Locations((-8.40517043, 43.707135146)):
            Circle(SKETCH27_R)
    extrude(amount=BOSS_EXTRUDE20_DEPTH)

    # Chamfer1
    chamfer1_edges = [body_6.edges().sort_by_distance(p)[0] for p in [
        (20.34317043, 43.707135146, -103.3908),
    ]]
    chamfer(chamfer1_edges, length=CHAMFER1_SIZE)

    # Fillet11
    fillet11_edges = [body_6.edges().sort_by_distance(p)[0] for p in [
        (20.34317043, 43.707135146, -101.1048),
    ]]
    fillet(fillet11_edges, radius=FILLET11_R)


with BuildPart() as body_7:
    # Sketch30 → Boss-Extrude21 (new body)
    with BuildSketch(Plane(origin=(0, 0, -44.196), x_dir=(-1, 0, 0), z_dir=(0, 0, -1))):
        with BuildLine():
            Line((-20.72417043, -10.693286285), (-18.94617043, -18.491086285))
            Line((-18.94617043, -18.491086285), (2.13582957, -18.491086285))
            Line((2.13582957, -18.491086285), (3.91382957, -10.693286285))
            ThreePointArc((3.91382957, -10.693286285), (7.761606127, -8.251890338), (6.047971228, -4.029420203))
            ThreePointArc((6.047971228, -4.029420203), (7.024528052, 2.454275322), (4.80282957, 8.623232021))
            ThreePointArc((4.80282957, 8.623232021), (4.488792314, 13.349170074), (-0.242367899, 13.571054992))
            Line((-0.242367899, 13.571054992), (-16.567972961, 13.571054992))
            ThreePointArc((-16.567972961, 13.571054992), (-21.299133174, 13.349170074), (-21.61317043, 8.623232021))
            ThreePointArc((-21.61317043, 8.623232021), (-23.83485908, 2.454274355), (-22.858312088, -4.029420203))
            ThreePointArc((-22.858312088, -4.029420203), (-24.571946987, -8.251890338), (-20.72417043, -10.693286285))
        make_face()
    extrude(amount=BOSS_EXTRUDE21_DEPTH)


with BuildPart() as body_8:
    # Sketch31 → Boss-Extrude23 (new body)
    with BuildSketch(Plane(origin=(0, 0, -144.196), x_dir=(-1, 0, 0), z_dir=(0, 0, -1))):
        with BuildLine():
            Line((-0.415899, 14.079054992), (-16.394441861, 14.079054992))
            ThreePointArc((-16.394441861, 14.079054992), (-21.588241548, 13.775696815), (-22.227712388, 8.612494473))
            ThreePointArc((-22.227712388, 8.612494473), (-24.336184911, 2.546364848), (-23.489636452, -3.819712493))
            ThreePointArc((-23.489636452, -3.819712493), (-25.056721349, -8.403768093), (-21.122639806, -11.230837818))
            Line((-21.122639806, -11.230837818), (-19.351377941, -18.999086285))
            Line((-19.351377941, -18.999086285), (2.54103708, -18.999086285))
            Line((2.54103708, -18.999086285), (4.312298946, -11.230837818))
            ThreePointArc((4.312298946, -11.230837818), (8.246380489, -8.403768093), (6.679295591, -3.819712493))
            ThreePointArc((6.679295591, -3.819712493), (7.52584405, 2.546364848), (5.417371527, 8.612494473))
            ThreePointArc((5.417371527, 8.612494473), (4.777900687, 13.775696815), (-0.415899, 14.079054992))
        make_face()
    extrude(amount=BOSS_EXTRUDE23_DEPTH)



with BuildPart() as body_9:
    # Sketch32 → Boss-Extrude24 (new body)
    with BuildSketch(Plane(origin=(0, 0, -149.022), x_dir=(-1, 0, 0), z_dir=(0, 0, -1))):
        with Locations((-8.40517043, 0.312983004)):
            Circle(SKETCH32_R)
    extrude(amount=BOSS_EXTRUDE24_DEPTH)


with BuildPart() as body_8_1:
    add(body_8.part)

    add(body_9.part)  # Boss-Extrude26 merges body 9
    # Sketch43 → Boss-Extrude26 (add)
    with BuildSketch(Plane(origin=(0, 0, -149.022), x_dir=(-1, 0, 0), z_dir=(0, 0, -1))):
        with Locations((-18.809281307, 10.810317247)):
            Circle(SKETCH43_R)
        with Locations((1.998940446, 10.810317247)):
            Circle(SKETCH43_R)
        with Locations((-21.185378257, -7.167322113)):
            Circle(SKETCH43_R)
        with Locations((4.375037396, -7.167322113)):
            Circle(SKETCH43_R)
    extrude(amount=BOSS_EXTRUDE26_DEPTH)

    # Fillet13
    fillet13_edges = [body_8_1.edges().sort_by_distance(p)[0] for p in [
        (22.365281307, 10.810317247, -151.562),
        (1.557059554, 10.810317247, -151.562),
        (24.741378257, -7.167322113, -151.562),
        (-0.819037396, -7.167322113, -151.562),
    ]]
    fillet(fillet13_edges, radius=FILLET13_R)


with BuildPart() as cut_extrude11_tool:
    # Sketch34 → Cut-Extrude11 (new body)
    with BuildSketch(Plane(origin=(0, 0, -157.15), x_dir=(-1, 0, 0), z_dir=(0, 0, -1))):
        with Locations((-8.40517043, 0.312983004)):
            Circle(SKETCH34_R)
    extrude(amount=-CUT_EXTRUDE11_DEPTH)


with BuildPart() as body_7_1:
    add(body_7.part)

    # Cut-Extrude11: cut by cut_extrude11_tool
    add(cut_extrude11_tool.part, mode=Mode.SUBTRACT)


with BuildPart() as body_8_2:
    add(body_8_1.part)

    # Cut-Extrude11: cut by cut_extrude11_tool
    add(cut_extrude11_tool.part, mode=Mode.SUBTRACT)


solid = Compound([part.part, body_2.part, body_3.part, body_4.part, body_5.part, body_6.part, body_7_1.part, body_8_2.part])
